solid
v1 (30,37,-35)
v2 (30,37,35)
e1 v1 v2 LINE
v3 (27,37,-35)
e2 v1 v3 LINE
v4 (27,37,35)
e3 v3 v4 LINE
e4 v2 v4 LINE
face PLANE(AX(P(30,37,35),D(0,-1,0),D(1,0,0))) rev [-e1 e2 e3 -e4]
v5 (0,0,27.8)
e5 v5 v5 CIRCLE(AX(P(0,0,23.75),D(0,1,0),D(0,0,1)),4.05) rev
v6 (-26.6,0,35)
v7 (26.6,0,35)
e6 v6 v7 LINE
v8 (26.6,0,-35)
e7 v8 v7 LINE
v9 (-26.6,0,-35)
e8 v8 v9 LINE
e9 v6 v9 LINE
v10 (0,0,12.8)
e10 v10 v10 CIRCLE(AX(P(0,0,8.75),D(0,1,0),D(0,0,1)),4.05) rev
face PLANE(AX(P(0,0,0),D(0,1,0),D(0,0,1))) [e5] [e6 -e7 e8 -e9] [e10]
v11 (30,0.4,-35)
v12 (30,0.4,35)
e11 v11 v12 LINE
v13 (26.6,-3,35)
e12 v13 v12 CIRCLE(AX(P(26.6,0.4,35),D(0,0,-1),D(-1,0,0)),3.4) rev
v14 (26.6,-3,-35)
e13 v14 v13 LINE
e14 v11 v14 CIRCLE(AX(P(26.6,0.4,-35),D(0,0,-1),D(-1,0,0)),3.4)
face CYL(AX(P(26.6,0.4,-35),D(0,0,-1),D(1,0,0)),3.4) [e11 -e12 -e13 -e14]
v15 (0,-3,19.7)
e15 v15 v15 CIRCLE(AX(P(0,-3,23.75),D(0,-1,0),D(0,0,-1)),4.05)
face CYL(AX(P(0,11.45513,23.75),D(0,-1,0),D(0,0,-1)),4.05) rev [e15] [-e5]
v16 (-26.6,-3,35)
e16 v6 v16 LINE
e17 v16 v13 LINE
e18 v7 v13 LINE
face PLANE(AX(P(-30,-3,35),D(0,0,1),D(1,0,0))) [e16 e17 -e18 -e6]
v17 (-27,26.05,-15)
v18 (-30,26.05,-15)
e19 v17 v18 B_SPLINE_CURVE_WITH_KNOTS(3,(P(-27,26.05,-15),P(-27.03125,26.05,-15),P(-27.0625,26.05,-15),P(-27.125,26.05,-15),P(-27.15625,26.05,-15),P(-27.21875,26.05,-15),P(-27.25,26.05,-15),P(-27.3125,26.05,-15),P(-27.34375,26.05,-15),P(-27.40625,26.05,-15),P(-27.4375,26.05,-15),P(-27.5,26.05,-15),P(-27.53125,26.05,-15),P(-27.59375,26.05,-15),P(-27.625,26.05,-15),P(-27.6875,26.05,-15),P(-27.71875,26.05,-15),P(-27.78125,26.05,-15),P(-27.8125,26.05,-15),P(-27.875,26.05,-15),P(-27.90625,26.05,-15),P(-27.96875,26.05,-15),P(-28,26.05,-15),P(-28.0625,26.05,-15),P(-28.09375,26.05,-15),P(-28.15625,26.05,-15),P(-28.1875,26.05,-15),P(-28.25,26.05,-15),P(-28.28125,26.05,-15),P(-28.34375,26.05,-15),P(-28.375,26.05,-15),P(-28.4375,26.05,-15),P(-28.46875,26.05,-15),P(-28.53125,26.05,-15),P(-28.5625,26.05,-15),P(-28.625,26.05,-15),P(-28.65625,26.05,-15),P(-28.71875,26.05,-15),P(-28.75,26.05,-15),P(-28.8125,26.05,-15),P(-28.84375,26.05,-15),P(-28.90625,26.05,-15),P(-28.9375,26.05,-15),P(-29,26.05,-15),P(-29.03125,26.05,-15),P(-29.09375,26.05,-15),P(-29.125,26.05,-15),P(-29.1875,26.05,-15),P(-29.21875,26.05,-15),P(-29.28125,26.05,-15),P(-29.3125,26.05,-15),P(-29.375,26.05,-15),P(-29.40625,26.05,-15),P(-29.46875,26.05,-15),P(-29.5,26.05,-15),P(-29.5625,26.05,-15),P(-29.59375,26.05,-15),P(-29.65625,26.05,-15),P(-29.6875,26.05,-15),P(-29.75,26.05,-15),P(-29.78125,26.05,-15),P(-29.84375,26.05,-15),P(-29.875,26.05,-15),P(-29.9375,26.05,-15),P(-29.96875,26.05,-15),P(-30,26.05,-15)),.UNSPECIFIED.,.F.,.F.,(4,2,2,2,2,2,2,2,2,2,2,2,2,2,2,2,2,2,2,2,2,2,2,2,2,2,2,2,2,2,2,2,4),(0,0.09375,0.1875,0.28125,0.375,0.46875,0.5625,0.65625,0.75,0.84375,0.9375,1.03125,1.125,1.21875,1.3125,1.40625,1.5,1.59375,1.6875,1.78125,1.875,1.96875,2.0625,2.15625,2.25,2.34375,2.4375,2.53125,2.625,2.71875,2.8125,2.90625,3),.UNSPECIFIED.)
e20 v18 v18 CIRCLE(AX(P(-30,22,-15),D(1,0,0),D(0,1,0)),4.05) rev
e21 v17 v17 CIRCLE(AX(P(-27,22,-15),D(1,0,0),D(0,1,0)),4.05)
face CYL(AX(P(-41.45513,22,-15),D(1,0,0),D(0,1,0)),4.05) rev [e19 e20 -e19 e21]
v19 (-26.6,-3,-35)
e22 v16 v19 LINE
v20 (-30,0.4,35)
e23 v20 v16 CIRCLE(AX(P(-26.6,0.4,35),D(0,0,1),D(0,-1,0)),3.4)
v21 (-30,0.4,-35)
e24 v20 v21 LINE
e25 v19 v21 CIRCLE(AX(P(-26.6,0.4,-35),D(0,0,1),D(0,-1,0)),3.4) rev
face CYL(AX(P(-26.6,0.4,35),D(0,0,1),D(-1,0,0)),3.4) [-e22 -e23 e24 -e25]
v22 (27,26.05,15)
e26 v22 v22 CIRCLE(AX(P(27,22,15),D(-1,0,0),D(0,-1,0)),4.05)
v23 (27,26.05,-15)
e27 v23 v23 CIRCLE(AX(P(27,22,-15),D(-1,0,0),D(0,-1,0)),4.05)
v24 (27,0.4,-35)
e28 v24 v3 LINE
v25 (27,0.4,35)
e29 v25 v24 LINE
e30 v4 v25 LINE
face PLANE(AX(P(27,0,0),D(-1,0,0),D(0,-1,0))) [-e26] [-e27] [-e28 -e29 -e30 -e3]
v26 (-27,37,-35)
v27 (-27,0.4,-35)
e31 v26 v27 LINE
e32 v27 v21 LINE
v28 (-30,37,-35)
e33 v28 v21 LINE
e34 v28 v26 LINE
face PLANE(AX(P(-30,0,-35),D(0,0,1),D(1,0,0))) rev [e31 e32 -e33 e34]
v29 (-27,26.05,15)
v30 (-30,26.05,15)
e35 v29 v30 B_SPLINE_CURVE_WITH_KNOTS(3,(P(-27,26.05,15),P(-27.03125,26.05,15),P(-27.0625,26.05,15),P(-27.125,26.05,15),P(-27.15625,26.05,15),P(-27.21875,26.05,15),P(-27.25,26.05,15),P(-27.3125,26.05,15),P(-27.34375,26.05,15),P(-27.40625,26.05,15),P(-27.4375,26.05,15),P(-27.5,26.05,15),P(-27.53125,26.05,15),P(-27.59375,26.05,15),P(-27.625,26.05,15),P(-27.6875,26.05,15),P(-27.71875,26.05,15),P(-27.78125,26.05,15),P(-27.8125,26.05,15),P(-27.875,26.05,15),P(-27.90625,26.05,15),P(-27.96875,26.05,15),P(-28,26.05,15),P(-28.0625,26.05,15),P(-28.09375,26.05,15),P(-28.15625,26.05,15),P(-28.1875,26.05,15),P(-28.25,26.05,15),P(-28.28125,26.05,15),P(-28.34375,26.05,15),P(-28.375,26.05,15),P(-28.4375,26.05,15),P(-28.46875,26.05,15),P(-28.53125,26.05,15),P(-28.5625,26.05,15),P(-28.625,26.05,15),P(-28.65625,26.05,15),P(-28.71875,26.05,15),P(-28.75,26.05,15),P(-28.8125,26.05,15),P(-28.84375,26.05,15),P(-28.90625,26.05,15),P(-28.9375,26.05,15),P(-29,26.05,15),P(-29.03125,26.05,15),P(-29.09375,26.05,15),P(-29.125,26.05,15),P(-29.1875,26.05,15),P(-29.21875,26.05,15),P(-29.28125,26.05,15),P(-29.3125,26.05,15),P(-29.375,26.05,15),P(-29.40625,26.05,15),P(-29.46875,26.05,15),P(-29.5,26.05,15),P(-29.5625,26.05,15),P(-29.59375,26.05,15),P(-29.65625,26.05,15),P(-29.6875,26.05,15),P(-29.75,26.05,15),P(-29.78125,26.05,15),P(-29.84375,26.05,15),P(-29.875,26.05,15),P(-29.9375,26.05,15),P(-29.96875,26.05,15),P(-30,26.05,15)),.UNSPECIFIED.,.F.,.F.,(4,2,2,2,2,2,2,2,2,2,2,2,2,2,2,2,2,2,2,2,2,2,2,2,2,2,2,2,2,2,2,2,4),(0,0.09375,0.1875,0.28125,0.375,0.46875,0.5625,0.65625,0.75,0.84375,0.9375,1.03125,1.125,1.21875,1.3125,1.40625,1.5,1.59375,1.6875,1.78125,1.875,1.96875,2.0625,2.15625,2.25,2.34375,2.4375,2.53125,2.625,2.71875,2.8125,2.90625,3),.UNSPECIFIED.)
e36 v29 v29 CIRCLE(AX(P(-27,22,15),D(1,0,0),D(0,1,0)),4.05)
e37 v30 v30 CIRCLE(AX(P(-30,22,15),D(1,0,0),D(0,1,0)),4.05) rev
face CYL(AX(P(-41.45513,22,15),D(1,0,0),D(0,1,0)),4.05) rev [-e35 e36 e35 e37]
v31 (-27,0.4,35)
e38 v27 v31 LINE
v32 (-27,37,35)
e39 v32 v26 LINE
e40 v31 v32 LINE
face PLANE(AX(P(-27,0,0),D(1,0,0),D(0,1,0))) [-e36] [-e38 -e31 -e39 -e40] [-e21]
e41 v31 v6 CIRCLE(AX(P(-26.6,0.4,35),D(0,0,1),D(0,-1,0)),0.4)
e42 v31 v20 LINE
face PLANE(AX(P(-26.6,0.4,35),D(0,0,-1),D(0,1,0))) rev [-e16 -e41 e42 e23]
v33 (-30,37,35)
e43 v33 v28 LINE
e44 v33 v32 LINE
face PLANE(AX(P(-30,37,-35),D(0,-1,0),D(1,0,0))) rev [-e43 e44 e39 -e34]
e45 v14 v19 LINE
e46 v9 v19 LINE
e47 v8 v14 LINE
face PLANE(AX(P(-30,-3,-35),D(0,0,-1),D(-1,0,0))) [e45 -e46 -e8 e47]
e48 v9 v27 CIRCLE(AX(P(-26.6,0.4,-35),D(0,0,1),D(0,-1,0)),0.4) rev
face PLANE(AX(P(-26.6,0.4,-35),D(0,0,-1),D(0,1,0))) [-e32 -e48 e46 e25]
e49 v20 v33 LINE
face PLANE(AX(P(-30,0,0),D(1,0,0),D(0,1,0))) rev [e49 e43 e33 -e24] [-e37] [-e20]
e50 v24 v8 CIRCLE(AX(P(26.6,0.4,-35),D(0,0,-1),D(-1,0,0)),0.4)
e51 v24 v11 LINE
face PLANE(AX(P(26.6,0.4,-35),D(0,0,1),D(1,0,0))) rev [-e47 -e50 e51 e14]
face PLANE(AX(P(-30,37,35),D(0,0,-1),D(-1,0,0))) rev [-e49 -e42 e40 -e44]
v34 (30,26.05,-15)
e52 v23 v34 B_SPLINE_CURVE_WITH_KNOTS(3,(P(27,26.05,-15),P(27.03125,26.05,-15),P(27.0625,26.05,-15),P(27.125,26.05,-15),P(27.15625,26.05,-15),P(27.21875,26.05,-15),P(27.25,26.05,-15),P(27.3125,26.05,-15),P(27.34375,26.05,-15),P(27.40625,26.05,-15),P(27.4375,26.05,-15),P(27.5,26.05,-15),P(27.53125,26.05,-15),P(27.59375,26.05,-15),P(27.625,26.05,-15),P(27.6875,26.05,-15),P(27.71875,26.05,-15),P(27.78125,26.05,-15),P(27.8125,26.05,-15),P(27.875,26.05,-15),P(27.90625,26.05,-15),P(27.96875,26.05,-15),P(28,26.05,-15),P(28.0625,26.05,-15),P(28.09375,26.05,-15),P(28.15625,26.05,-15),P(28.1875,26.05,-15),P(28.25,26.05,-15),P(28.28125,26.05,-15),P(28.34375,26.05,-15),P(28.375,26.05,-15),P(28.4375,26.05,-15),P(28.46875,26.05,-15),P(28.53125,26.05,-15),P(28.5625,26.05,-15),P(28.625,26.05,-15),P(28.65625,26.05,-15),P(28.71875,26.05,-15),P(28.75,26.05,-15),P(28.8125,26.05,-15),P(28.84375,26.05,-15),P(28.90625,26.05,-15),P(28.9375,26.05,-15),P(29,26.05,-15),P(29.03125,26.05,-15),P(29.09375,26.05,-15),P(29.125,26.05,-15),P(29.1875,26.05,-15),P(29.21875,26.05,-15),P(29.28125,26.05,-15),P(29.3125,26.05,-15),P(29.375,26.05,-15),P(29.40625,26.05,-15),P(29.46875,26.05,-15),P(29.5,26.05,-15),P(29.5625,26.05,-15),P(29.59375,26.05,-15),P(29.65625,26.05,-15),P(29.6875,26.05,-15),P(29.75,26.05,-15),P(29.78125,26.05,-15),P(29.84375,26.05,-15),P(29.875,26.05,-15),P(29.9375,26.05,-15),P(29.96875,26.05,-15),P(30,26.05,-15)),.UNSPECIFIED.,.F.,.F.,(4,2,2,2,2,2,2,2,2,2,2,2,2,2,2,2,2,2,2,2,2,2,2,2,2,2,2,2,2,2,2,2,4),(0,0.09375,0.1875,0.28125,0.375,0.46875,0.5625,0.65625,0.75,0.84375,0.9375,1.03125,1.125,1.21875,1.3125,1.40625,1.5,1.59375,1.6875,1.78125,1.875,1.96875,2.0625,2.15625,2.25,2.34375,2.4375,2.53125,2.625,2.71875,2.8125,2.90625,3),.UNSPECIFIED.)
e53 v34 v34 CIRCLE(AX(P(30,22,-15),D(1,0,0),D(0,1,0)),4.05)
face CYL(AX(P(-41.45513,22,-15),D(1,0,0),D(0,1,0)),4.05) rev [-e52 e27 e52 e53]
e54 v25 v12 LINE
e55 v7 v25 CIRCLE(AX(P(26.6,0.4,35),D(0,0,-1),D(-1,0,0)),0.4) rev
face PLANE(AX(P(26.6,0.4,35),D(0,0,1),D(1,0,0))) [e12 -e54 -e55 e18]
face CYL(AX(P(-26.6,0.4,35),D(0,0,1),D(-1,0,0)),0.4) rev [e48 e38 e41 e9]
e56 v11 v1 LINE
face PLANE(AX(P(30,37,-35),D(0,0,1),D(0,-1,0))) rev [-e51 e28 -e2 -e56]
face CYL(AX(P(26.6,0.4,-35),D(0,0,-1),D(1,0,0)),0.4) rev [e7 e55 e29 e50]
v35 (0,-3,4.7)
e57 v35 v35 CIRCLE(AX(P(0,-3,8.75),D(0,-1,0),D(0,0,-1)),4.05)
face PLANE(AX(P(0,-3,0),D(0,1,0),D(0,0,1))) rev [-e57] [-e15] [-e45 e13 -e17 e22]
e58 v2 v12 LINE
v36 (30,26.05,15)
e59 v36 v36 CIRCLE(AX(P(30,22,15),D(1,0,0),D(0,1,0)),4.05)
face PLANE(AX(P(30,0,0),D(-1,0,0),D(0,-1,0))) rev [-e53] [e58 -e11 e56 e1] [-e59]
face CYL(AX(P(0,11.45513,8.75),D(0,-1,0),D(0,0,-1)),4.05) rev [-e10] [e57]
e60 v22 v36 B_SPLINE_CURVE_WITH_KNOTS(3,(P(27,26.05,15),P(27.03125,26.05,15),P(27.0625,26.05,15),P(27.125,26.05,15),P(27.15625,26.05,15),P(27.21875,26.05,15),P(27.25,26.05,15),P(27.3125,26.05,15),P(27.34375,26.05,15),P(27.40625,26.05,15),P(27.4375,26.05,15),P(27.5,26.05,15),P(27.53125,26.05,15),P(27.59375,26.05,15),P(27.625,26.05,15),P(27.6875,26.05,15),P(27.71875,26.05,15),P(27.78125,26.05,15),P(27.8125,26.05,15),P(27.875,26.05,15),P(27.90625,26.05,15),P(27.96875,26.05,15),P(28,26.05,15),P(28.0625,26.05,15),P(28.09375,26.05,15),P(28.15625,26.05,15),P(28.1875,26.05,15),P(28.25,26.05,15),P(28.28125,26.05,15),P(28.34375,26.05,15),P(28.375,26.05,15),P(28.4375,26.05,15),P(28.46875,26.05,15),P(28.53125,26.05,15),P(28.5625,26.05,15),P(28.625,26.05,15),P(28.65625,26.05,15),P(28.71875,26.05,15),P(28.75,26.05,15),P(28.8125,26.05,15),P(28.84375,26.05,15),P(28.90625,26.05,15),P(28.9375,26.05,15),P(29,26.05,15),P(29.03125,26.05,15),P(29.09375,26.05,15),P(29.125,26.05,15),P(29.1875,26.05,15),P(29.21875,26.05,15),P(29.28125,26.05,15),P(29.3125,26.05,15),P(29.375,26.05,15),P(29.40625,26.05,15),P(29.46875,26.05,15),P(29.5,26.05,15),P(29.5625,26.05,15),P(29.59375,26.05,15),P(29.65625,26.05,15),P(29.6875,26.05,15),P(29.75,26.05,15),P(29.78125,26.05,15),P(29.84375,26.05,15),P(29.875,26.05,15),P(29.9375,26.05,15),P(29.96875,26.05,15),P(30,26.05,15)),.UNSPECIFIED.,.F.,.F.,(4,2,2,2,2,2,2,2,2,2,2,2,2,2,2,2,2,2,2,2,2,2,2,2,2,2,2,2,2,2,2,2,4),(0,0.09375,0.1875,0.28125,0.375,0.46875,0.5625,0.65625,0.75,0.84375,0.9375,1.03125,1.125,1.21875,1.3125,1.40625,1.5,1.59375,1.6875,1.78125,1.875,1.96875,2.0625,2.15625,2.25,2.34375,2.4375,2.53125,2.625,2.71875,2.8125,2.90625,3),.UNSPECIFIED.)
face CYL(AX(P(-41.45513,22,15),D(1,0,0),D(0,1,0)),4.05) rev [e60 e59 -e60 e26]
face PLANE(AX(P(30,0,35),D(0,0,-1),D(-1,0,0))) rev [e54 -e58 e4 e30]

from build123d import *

# Parameters (mm, degrees)
SKETCH1_W                      = 60
SKETCH1_H                      = 70
BASE_FLANGE1_DEPTH             = 3
EDGE_FLANGE1_STRIP_W           = 12.8
EDGE_FLANGE1_STRIP_H           = 3
EDGE_FLANGE1_STRIP_CUT_DEPTH   = 70
EDGE_FLANGE1_STRIP_2_W         = 12.8
EDGE_FLANGE1_STRIP_2_H         = 3
EDGE_FLANGE1_STRIP_CUT_2_DEPTH = 70
EDGE_FLANGE1_DEPTH             = 70
EDGE_FLANGE1_BEND_DEPTH        = 70
CUT_EXTRUDE1_REACH             = 80.702
SKETCH14_R                     = 4.05
SKETCH15_R                     = 4.05
CUT_EXTRUDE2_DEPTH             = 3


# Sheet-metal steps are written as plain solids
with BuildPart() as part:
    # Sketch1 → Base-Flange1 (new body)
    with BuildSketch(Plane(origin=(0, 0, 0), x_dir=(1, 0, 0), z_dir=(0, 1, 0))):
        Rectangle(SKETCH1_W, SKETCH1_H)
    extrude(amount=-BASE_FLANGE1_DEPTH)

    # Edge-Flange1 strip (across the edge) → Edge-Flange1 strip cut (cut)
    with BuildSketch(Plane(origin=(30, 0, 35), x_dir=(-1, 0, 0), z_dir=(0, 0, -1))):
        with Locations((-3, -1.5)):
            Rectangle(EDGE_FLANGE1_STRIP_W, EDGE_FLANGE1_STRIP_H)
    extrude(amount=EDGE_FLANGE1_STRIP_CUT_DEPTH, mode=Mode.SUBTRACT)

    # Edge-Flange1 strip 2 (across the edge) → Edge-Flange1 strip cut 2 (cut)
    with BuildSketch(Plane(origin=(-30, 0, -35), x_dir=(1, 0, 0), z_dir=(0, 0, 1))):
        with Locations((-3, -1.5)):
            Rectangle(EDGE_FLANGE1_STRIP_2_W, EDGE_FLANGE1_STRIP_2_H)
    extrude(amount=EDGE_FLANGE1_STRIP_CUT_2_DEPTH, mode=Mode.SUBTRACT)

    # Edge-Flange1 section (across the edge) → Edge-Flange1 (add)
    with BuildSketch(Plane(origin=(30, 0, 35), x_dir=(-1, 0, 0), z_dir=(0, 0, -1))):
        with BuildLine():
            Line((0, 0.4), (0, 37))
            Line((0, 37), (3, 37))
            Line((3, 37), (3, 0.4))
            ThreePointArc((3, 0.4), (3.117157288, 0.117157288), (3.4, 0))
            Line((3.4, 0), (3.4, -3))
            ThreePointArc((3.4, -3), (0.995836944, -2.004163056), (0, 0.4))
        make_face()
    extrude(amount=EDGE_FLANGE1_DEPTH)

    # Edge-Flange1 section 2 (across the edge) → Edge-Flange1 bend (add)
    with BuildSketch(Plane(origin=(-30, 0, -35), x_dir=(1, 0, 0), z_dir=(0, 0, 1))):
        with BuildLine():
            Line((0, 0.4), (0, 37))
            Line((0, 37), (3, 37))
            Line((3, 37), (3, 0.4))
            ThreePointArc((3, 0.4), (3.117157288, 0.117157288), (3.4, 0))
            Line((3.4, 0), (3.4, -3))
            ThreePointArc((3.4, -3), (0.995836944, -2.004163056), (0, 0.4))
        make_face()
    extrude(amount=EDGE_FLANGE1_BEND_DEPTH)

    # Cut-Extrude1: up to this face of the body (flat: up to its plane)
    cut_extrude1_end = Plane(part.part.faces().sort_by_distance((-30, 18.7, 0))[0])
    # Sketch14 → Cut-Extrude1 (cut, up to the picked face)
    with BuildSketch(Plane(origin=(30, 0, 0), x_dir=(0, 0, -1), z_dir=(1, 0, 0)), mode=Mode.PRIVATE) as cut_extrude1_sk1:
        with Locations(Location((-15, 22, 0), (0, 0, 90))):
            Circle(SKETCH14_R)
    cut_extrude1_tool1 = split(extrude(cut_extrude1_sk1.sketch, amount=-CUT_EXTRUDE1_REACH, mode=Mode.PRIVATE), bisect_by=cut_extrude1_end, keep=Keep.BOTH, mode=Mode.PRIVATE)
    # Sketch14 → Cut-Extrude1 (cut, up to the picked face)
    with BuildSketch(Plane(origin=(30, 0, 0), x_dir=(0, 0, -1), z_dir=(1, 0, 0)), mode=Mode.PRIVATE) as cut_extrude1_sk2:
        with Locations(Location((15, 22, 0), (0, 0, 90))):
            Circle(SKETCH14_R)
    cut_extrude1_tool2 = split(extrude(cut_extrude1_sk2.sketch, amount=-CUT_EXTRUDE1_REACH, mode=Mode.PRIVATE), bisect_by=cut_extrude1_end, keep=Keep.BOTH, mode=Mode.PRIVATE)
    add(cut_extrude1_tool1.solids().sort_by(Axis((30, 22, 15), (-1, 0, 0)))[0], mode=Mode.SUBTRACT)
    add(cut_extrude1_tool2.solids().sort_by(Axis((30, 22, -15), (-1, 0, 0)))[0], mode=Mode.SUBTRACT)

    # Sketch15 → Cut-Extrude2 (cut)
    with BuildSketch(Plane.XZ.offset(3)):
        with Locations(Location((0, 8.75, 0), (0, 0, 270))):
            Circle(SKETCH15_R)
        with Locations(Location((0, 23.75, 0), (0, 0, 270))):
            Circle(SKETCH15_R)
    extrude(amount=-CUT_EXTRUDE2_DEPTH, mode=Mode.SUBTRACT)


solid = part.part
